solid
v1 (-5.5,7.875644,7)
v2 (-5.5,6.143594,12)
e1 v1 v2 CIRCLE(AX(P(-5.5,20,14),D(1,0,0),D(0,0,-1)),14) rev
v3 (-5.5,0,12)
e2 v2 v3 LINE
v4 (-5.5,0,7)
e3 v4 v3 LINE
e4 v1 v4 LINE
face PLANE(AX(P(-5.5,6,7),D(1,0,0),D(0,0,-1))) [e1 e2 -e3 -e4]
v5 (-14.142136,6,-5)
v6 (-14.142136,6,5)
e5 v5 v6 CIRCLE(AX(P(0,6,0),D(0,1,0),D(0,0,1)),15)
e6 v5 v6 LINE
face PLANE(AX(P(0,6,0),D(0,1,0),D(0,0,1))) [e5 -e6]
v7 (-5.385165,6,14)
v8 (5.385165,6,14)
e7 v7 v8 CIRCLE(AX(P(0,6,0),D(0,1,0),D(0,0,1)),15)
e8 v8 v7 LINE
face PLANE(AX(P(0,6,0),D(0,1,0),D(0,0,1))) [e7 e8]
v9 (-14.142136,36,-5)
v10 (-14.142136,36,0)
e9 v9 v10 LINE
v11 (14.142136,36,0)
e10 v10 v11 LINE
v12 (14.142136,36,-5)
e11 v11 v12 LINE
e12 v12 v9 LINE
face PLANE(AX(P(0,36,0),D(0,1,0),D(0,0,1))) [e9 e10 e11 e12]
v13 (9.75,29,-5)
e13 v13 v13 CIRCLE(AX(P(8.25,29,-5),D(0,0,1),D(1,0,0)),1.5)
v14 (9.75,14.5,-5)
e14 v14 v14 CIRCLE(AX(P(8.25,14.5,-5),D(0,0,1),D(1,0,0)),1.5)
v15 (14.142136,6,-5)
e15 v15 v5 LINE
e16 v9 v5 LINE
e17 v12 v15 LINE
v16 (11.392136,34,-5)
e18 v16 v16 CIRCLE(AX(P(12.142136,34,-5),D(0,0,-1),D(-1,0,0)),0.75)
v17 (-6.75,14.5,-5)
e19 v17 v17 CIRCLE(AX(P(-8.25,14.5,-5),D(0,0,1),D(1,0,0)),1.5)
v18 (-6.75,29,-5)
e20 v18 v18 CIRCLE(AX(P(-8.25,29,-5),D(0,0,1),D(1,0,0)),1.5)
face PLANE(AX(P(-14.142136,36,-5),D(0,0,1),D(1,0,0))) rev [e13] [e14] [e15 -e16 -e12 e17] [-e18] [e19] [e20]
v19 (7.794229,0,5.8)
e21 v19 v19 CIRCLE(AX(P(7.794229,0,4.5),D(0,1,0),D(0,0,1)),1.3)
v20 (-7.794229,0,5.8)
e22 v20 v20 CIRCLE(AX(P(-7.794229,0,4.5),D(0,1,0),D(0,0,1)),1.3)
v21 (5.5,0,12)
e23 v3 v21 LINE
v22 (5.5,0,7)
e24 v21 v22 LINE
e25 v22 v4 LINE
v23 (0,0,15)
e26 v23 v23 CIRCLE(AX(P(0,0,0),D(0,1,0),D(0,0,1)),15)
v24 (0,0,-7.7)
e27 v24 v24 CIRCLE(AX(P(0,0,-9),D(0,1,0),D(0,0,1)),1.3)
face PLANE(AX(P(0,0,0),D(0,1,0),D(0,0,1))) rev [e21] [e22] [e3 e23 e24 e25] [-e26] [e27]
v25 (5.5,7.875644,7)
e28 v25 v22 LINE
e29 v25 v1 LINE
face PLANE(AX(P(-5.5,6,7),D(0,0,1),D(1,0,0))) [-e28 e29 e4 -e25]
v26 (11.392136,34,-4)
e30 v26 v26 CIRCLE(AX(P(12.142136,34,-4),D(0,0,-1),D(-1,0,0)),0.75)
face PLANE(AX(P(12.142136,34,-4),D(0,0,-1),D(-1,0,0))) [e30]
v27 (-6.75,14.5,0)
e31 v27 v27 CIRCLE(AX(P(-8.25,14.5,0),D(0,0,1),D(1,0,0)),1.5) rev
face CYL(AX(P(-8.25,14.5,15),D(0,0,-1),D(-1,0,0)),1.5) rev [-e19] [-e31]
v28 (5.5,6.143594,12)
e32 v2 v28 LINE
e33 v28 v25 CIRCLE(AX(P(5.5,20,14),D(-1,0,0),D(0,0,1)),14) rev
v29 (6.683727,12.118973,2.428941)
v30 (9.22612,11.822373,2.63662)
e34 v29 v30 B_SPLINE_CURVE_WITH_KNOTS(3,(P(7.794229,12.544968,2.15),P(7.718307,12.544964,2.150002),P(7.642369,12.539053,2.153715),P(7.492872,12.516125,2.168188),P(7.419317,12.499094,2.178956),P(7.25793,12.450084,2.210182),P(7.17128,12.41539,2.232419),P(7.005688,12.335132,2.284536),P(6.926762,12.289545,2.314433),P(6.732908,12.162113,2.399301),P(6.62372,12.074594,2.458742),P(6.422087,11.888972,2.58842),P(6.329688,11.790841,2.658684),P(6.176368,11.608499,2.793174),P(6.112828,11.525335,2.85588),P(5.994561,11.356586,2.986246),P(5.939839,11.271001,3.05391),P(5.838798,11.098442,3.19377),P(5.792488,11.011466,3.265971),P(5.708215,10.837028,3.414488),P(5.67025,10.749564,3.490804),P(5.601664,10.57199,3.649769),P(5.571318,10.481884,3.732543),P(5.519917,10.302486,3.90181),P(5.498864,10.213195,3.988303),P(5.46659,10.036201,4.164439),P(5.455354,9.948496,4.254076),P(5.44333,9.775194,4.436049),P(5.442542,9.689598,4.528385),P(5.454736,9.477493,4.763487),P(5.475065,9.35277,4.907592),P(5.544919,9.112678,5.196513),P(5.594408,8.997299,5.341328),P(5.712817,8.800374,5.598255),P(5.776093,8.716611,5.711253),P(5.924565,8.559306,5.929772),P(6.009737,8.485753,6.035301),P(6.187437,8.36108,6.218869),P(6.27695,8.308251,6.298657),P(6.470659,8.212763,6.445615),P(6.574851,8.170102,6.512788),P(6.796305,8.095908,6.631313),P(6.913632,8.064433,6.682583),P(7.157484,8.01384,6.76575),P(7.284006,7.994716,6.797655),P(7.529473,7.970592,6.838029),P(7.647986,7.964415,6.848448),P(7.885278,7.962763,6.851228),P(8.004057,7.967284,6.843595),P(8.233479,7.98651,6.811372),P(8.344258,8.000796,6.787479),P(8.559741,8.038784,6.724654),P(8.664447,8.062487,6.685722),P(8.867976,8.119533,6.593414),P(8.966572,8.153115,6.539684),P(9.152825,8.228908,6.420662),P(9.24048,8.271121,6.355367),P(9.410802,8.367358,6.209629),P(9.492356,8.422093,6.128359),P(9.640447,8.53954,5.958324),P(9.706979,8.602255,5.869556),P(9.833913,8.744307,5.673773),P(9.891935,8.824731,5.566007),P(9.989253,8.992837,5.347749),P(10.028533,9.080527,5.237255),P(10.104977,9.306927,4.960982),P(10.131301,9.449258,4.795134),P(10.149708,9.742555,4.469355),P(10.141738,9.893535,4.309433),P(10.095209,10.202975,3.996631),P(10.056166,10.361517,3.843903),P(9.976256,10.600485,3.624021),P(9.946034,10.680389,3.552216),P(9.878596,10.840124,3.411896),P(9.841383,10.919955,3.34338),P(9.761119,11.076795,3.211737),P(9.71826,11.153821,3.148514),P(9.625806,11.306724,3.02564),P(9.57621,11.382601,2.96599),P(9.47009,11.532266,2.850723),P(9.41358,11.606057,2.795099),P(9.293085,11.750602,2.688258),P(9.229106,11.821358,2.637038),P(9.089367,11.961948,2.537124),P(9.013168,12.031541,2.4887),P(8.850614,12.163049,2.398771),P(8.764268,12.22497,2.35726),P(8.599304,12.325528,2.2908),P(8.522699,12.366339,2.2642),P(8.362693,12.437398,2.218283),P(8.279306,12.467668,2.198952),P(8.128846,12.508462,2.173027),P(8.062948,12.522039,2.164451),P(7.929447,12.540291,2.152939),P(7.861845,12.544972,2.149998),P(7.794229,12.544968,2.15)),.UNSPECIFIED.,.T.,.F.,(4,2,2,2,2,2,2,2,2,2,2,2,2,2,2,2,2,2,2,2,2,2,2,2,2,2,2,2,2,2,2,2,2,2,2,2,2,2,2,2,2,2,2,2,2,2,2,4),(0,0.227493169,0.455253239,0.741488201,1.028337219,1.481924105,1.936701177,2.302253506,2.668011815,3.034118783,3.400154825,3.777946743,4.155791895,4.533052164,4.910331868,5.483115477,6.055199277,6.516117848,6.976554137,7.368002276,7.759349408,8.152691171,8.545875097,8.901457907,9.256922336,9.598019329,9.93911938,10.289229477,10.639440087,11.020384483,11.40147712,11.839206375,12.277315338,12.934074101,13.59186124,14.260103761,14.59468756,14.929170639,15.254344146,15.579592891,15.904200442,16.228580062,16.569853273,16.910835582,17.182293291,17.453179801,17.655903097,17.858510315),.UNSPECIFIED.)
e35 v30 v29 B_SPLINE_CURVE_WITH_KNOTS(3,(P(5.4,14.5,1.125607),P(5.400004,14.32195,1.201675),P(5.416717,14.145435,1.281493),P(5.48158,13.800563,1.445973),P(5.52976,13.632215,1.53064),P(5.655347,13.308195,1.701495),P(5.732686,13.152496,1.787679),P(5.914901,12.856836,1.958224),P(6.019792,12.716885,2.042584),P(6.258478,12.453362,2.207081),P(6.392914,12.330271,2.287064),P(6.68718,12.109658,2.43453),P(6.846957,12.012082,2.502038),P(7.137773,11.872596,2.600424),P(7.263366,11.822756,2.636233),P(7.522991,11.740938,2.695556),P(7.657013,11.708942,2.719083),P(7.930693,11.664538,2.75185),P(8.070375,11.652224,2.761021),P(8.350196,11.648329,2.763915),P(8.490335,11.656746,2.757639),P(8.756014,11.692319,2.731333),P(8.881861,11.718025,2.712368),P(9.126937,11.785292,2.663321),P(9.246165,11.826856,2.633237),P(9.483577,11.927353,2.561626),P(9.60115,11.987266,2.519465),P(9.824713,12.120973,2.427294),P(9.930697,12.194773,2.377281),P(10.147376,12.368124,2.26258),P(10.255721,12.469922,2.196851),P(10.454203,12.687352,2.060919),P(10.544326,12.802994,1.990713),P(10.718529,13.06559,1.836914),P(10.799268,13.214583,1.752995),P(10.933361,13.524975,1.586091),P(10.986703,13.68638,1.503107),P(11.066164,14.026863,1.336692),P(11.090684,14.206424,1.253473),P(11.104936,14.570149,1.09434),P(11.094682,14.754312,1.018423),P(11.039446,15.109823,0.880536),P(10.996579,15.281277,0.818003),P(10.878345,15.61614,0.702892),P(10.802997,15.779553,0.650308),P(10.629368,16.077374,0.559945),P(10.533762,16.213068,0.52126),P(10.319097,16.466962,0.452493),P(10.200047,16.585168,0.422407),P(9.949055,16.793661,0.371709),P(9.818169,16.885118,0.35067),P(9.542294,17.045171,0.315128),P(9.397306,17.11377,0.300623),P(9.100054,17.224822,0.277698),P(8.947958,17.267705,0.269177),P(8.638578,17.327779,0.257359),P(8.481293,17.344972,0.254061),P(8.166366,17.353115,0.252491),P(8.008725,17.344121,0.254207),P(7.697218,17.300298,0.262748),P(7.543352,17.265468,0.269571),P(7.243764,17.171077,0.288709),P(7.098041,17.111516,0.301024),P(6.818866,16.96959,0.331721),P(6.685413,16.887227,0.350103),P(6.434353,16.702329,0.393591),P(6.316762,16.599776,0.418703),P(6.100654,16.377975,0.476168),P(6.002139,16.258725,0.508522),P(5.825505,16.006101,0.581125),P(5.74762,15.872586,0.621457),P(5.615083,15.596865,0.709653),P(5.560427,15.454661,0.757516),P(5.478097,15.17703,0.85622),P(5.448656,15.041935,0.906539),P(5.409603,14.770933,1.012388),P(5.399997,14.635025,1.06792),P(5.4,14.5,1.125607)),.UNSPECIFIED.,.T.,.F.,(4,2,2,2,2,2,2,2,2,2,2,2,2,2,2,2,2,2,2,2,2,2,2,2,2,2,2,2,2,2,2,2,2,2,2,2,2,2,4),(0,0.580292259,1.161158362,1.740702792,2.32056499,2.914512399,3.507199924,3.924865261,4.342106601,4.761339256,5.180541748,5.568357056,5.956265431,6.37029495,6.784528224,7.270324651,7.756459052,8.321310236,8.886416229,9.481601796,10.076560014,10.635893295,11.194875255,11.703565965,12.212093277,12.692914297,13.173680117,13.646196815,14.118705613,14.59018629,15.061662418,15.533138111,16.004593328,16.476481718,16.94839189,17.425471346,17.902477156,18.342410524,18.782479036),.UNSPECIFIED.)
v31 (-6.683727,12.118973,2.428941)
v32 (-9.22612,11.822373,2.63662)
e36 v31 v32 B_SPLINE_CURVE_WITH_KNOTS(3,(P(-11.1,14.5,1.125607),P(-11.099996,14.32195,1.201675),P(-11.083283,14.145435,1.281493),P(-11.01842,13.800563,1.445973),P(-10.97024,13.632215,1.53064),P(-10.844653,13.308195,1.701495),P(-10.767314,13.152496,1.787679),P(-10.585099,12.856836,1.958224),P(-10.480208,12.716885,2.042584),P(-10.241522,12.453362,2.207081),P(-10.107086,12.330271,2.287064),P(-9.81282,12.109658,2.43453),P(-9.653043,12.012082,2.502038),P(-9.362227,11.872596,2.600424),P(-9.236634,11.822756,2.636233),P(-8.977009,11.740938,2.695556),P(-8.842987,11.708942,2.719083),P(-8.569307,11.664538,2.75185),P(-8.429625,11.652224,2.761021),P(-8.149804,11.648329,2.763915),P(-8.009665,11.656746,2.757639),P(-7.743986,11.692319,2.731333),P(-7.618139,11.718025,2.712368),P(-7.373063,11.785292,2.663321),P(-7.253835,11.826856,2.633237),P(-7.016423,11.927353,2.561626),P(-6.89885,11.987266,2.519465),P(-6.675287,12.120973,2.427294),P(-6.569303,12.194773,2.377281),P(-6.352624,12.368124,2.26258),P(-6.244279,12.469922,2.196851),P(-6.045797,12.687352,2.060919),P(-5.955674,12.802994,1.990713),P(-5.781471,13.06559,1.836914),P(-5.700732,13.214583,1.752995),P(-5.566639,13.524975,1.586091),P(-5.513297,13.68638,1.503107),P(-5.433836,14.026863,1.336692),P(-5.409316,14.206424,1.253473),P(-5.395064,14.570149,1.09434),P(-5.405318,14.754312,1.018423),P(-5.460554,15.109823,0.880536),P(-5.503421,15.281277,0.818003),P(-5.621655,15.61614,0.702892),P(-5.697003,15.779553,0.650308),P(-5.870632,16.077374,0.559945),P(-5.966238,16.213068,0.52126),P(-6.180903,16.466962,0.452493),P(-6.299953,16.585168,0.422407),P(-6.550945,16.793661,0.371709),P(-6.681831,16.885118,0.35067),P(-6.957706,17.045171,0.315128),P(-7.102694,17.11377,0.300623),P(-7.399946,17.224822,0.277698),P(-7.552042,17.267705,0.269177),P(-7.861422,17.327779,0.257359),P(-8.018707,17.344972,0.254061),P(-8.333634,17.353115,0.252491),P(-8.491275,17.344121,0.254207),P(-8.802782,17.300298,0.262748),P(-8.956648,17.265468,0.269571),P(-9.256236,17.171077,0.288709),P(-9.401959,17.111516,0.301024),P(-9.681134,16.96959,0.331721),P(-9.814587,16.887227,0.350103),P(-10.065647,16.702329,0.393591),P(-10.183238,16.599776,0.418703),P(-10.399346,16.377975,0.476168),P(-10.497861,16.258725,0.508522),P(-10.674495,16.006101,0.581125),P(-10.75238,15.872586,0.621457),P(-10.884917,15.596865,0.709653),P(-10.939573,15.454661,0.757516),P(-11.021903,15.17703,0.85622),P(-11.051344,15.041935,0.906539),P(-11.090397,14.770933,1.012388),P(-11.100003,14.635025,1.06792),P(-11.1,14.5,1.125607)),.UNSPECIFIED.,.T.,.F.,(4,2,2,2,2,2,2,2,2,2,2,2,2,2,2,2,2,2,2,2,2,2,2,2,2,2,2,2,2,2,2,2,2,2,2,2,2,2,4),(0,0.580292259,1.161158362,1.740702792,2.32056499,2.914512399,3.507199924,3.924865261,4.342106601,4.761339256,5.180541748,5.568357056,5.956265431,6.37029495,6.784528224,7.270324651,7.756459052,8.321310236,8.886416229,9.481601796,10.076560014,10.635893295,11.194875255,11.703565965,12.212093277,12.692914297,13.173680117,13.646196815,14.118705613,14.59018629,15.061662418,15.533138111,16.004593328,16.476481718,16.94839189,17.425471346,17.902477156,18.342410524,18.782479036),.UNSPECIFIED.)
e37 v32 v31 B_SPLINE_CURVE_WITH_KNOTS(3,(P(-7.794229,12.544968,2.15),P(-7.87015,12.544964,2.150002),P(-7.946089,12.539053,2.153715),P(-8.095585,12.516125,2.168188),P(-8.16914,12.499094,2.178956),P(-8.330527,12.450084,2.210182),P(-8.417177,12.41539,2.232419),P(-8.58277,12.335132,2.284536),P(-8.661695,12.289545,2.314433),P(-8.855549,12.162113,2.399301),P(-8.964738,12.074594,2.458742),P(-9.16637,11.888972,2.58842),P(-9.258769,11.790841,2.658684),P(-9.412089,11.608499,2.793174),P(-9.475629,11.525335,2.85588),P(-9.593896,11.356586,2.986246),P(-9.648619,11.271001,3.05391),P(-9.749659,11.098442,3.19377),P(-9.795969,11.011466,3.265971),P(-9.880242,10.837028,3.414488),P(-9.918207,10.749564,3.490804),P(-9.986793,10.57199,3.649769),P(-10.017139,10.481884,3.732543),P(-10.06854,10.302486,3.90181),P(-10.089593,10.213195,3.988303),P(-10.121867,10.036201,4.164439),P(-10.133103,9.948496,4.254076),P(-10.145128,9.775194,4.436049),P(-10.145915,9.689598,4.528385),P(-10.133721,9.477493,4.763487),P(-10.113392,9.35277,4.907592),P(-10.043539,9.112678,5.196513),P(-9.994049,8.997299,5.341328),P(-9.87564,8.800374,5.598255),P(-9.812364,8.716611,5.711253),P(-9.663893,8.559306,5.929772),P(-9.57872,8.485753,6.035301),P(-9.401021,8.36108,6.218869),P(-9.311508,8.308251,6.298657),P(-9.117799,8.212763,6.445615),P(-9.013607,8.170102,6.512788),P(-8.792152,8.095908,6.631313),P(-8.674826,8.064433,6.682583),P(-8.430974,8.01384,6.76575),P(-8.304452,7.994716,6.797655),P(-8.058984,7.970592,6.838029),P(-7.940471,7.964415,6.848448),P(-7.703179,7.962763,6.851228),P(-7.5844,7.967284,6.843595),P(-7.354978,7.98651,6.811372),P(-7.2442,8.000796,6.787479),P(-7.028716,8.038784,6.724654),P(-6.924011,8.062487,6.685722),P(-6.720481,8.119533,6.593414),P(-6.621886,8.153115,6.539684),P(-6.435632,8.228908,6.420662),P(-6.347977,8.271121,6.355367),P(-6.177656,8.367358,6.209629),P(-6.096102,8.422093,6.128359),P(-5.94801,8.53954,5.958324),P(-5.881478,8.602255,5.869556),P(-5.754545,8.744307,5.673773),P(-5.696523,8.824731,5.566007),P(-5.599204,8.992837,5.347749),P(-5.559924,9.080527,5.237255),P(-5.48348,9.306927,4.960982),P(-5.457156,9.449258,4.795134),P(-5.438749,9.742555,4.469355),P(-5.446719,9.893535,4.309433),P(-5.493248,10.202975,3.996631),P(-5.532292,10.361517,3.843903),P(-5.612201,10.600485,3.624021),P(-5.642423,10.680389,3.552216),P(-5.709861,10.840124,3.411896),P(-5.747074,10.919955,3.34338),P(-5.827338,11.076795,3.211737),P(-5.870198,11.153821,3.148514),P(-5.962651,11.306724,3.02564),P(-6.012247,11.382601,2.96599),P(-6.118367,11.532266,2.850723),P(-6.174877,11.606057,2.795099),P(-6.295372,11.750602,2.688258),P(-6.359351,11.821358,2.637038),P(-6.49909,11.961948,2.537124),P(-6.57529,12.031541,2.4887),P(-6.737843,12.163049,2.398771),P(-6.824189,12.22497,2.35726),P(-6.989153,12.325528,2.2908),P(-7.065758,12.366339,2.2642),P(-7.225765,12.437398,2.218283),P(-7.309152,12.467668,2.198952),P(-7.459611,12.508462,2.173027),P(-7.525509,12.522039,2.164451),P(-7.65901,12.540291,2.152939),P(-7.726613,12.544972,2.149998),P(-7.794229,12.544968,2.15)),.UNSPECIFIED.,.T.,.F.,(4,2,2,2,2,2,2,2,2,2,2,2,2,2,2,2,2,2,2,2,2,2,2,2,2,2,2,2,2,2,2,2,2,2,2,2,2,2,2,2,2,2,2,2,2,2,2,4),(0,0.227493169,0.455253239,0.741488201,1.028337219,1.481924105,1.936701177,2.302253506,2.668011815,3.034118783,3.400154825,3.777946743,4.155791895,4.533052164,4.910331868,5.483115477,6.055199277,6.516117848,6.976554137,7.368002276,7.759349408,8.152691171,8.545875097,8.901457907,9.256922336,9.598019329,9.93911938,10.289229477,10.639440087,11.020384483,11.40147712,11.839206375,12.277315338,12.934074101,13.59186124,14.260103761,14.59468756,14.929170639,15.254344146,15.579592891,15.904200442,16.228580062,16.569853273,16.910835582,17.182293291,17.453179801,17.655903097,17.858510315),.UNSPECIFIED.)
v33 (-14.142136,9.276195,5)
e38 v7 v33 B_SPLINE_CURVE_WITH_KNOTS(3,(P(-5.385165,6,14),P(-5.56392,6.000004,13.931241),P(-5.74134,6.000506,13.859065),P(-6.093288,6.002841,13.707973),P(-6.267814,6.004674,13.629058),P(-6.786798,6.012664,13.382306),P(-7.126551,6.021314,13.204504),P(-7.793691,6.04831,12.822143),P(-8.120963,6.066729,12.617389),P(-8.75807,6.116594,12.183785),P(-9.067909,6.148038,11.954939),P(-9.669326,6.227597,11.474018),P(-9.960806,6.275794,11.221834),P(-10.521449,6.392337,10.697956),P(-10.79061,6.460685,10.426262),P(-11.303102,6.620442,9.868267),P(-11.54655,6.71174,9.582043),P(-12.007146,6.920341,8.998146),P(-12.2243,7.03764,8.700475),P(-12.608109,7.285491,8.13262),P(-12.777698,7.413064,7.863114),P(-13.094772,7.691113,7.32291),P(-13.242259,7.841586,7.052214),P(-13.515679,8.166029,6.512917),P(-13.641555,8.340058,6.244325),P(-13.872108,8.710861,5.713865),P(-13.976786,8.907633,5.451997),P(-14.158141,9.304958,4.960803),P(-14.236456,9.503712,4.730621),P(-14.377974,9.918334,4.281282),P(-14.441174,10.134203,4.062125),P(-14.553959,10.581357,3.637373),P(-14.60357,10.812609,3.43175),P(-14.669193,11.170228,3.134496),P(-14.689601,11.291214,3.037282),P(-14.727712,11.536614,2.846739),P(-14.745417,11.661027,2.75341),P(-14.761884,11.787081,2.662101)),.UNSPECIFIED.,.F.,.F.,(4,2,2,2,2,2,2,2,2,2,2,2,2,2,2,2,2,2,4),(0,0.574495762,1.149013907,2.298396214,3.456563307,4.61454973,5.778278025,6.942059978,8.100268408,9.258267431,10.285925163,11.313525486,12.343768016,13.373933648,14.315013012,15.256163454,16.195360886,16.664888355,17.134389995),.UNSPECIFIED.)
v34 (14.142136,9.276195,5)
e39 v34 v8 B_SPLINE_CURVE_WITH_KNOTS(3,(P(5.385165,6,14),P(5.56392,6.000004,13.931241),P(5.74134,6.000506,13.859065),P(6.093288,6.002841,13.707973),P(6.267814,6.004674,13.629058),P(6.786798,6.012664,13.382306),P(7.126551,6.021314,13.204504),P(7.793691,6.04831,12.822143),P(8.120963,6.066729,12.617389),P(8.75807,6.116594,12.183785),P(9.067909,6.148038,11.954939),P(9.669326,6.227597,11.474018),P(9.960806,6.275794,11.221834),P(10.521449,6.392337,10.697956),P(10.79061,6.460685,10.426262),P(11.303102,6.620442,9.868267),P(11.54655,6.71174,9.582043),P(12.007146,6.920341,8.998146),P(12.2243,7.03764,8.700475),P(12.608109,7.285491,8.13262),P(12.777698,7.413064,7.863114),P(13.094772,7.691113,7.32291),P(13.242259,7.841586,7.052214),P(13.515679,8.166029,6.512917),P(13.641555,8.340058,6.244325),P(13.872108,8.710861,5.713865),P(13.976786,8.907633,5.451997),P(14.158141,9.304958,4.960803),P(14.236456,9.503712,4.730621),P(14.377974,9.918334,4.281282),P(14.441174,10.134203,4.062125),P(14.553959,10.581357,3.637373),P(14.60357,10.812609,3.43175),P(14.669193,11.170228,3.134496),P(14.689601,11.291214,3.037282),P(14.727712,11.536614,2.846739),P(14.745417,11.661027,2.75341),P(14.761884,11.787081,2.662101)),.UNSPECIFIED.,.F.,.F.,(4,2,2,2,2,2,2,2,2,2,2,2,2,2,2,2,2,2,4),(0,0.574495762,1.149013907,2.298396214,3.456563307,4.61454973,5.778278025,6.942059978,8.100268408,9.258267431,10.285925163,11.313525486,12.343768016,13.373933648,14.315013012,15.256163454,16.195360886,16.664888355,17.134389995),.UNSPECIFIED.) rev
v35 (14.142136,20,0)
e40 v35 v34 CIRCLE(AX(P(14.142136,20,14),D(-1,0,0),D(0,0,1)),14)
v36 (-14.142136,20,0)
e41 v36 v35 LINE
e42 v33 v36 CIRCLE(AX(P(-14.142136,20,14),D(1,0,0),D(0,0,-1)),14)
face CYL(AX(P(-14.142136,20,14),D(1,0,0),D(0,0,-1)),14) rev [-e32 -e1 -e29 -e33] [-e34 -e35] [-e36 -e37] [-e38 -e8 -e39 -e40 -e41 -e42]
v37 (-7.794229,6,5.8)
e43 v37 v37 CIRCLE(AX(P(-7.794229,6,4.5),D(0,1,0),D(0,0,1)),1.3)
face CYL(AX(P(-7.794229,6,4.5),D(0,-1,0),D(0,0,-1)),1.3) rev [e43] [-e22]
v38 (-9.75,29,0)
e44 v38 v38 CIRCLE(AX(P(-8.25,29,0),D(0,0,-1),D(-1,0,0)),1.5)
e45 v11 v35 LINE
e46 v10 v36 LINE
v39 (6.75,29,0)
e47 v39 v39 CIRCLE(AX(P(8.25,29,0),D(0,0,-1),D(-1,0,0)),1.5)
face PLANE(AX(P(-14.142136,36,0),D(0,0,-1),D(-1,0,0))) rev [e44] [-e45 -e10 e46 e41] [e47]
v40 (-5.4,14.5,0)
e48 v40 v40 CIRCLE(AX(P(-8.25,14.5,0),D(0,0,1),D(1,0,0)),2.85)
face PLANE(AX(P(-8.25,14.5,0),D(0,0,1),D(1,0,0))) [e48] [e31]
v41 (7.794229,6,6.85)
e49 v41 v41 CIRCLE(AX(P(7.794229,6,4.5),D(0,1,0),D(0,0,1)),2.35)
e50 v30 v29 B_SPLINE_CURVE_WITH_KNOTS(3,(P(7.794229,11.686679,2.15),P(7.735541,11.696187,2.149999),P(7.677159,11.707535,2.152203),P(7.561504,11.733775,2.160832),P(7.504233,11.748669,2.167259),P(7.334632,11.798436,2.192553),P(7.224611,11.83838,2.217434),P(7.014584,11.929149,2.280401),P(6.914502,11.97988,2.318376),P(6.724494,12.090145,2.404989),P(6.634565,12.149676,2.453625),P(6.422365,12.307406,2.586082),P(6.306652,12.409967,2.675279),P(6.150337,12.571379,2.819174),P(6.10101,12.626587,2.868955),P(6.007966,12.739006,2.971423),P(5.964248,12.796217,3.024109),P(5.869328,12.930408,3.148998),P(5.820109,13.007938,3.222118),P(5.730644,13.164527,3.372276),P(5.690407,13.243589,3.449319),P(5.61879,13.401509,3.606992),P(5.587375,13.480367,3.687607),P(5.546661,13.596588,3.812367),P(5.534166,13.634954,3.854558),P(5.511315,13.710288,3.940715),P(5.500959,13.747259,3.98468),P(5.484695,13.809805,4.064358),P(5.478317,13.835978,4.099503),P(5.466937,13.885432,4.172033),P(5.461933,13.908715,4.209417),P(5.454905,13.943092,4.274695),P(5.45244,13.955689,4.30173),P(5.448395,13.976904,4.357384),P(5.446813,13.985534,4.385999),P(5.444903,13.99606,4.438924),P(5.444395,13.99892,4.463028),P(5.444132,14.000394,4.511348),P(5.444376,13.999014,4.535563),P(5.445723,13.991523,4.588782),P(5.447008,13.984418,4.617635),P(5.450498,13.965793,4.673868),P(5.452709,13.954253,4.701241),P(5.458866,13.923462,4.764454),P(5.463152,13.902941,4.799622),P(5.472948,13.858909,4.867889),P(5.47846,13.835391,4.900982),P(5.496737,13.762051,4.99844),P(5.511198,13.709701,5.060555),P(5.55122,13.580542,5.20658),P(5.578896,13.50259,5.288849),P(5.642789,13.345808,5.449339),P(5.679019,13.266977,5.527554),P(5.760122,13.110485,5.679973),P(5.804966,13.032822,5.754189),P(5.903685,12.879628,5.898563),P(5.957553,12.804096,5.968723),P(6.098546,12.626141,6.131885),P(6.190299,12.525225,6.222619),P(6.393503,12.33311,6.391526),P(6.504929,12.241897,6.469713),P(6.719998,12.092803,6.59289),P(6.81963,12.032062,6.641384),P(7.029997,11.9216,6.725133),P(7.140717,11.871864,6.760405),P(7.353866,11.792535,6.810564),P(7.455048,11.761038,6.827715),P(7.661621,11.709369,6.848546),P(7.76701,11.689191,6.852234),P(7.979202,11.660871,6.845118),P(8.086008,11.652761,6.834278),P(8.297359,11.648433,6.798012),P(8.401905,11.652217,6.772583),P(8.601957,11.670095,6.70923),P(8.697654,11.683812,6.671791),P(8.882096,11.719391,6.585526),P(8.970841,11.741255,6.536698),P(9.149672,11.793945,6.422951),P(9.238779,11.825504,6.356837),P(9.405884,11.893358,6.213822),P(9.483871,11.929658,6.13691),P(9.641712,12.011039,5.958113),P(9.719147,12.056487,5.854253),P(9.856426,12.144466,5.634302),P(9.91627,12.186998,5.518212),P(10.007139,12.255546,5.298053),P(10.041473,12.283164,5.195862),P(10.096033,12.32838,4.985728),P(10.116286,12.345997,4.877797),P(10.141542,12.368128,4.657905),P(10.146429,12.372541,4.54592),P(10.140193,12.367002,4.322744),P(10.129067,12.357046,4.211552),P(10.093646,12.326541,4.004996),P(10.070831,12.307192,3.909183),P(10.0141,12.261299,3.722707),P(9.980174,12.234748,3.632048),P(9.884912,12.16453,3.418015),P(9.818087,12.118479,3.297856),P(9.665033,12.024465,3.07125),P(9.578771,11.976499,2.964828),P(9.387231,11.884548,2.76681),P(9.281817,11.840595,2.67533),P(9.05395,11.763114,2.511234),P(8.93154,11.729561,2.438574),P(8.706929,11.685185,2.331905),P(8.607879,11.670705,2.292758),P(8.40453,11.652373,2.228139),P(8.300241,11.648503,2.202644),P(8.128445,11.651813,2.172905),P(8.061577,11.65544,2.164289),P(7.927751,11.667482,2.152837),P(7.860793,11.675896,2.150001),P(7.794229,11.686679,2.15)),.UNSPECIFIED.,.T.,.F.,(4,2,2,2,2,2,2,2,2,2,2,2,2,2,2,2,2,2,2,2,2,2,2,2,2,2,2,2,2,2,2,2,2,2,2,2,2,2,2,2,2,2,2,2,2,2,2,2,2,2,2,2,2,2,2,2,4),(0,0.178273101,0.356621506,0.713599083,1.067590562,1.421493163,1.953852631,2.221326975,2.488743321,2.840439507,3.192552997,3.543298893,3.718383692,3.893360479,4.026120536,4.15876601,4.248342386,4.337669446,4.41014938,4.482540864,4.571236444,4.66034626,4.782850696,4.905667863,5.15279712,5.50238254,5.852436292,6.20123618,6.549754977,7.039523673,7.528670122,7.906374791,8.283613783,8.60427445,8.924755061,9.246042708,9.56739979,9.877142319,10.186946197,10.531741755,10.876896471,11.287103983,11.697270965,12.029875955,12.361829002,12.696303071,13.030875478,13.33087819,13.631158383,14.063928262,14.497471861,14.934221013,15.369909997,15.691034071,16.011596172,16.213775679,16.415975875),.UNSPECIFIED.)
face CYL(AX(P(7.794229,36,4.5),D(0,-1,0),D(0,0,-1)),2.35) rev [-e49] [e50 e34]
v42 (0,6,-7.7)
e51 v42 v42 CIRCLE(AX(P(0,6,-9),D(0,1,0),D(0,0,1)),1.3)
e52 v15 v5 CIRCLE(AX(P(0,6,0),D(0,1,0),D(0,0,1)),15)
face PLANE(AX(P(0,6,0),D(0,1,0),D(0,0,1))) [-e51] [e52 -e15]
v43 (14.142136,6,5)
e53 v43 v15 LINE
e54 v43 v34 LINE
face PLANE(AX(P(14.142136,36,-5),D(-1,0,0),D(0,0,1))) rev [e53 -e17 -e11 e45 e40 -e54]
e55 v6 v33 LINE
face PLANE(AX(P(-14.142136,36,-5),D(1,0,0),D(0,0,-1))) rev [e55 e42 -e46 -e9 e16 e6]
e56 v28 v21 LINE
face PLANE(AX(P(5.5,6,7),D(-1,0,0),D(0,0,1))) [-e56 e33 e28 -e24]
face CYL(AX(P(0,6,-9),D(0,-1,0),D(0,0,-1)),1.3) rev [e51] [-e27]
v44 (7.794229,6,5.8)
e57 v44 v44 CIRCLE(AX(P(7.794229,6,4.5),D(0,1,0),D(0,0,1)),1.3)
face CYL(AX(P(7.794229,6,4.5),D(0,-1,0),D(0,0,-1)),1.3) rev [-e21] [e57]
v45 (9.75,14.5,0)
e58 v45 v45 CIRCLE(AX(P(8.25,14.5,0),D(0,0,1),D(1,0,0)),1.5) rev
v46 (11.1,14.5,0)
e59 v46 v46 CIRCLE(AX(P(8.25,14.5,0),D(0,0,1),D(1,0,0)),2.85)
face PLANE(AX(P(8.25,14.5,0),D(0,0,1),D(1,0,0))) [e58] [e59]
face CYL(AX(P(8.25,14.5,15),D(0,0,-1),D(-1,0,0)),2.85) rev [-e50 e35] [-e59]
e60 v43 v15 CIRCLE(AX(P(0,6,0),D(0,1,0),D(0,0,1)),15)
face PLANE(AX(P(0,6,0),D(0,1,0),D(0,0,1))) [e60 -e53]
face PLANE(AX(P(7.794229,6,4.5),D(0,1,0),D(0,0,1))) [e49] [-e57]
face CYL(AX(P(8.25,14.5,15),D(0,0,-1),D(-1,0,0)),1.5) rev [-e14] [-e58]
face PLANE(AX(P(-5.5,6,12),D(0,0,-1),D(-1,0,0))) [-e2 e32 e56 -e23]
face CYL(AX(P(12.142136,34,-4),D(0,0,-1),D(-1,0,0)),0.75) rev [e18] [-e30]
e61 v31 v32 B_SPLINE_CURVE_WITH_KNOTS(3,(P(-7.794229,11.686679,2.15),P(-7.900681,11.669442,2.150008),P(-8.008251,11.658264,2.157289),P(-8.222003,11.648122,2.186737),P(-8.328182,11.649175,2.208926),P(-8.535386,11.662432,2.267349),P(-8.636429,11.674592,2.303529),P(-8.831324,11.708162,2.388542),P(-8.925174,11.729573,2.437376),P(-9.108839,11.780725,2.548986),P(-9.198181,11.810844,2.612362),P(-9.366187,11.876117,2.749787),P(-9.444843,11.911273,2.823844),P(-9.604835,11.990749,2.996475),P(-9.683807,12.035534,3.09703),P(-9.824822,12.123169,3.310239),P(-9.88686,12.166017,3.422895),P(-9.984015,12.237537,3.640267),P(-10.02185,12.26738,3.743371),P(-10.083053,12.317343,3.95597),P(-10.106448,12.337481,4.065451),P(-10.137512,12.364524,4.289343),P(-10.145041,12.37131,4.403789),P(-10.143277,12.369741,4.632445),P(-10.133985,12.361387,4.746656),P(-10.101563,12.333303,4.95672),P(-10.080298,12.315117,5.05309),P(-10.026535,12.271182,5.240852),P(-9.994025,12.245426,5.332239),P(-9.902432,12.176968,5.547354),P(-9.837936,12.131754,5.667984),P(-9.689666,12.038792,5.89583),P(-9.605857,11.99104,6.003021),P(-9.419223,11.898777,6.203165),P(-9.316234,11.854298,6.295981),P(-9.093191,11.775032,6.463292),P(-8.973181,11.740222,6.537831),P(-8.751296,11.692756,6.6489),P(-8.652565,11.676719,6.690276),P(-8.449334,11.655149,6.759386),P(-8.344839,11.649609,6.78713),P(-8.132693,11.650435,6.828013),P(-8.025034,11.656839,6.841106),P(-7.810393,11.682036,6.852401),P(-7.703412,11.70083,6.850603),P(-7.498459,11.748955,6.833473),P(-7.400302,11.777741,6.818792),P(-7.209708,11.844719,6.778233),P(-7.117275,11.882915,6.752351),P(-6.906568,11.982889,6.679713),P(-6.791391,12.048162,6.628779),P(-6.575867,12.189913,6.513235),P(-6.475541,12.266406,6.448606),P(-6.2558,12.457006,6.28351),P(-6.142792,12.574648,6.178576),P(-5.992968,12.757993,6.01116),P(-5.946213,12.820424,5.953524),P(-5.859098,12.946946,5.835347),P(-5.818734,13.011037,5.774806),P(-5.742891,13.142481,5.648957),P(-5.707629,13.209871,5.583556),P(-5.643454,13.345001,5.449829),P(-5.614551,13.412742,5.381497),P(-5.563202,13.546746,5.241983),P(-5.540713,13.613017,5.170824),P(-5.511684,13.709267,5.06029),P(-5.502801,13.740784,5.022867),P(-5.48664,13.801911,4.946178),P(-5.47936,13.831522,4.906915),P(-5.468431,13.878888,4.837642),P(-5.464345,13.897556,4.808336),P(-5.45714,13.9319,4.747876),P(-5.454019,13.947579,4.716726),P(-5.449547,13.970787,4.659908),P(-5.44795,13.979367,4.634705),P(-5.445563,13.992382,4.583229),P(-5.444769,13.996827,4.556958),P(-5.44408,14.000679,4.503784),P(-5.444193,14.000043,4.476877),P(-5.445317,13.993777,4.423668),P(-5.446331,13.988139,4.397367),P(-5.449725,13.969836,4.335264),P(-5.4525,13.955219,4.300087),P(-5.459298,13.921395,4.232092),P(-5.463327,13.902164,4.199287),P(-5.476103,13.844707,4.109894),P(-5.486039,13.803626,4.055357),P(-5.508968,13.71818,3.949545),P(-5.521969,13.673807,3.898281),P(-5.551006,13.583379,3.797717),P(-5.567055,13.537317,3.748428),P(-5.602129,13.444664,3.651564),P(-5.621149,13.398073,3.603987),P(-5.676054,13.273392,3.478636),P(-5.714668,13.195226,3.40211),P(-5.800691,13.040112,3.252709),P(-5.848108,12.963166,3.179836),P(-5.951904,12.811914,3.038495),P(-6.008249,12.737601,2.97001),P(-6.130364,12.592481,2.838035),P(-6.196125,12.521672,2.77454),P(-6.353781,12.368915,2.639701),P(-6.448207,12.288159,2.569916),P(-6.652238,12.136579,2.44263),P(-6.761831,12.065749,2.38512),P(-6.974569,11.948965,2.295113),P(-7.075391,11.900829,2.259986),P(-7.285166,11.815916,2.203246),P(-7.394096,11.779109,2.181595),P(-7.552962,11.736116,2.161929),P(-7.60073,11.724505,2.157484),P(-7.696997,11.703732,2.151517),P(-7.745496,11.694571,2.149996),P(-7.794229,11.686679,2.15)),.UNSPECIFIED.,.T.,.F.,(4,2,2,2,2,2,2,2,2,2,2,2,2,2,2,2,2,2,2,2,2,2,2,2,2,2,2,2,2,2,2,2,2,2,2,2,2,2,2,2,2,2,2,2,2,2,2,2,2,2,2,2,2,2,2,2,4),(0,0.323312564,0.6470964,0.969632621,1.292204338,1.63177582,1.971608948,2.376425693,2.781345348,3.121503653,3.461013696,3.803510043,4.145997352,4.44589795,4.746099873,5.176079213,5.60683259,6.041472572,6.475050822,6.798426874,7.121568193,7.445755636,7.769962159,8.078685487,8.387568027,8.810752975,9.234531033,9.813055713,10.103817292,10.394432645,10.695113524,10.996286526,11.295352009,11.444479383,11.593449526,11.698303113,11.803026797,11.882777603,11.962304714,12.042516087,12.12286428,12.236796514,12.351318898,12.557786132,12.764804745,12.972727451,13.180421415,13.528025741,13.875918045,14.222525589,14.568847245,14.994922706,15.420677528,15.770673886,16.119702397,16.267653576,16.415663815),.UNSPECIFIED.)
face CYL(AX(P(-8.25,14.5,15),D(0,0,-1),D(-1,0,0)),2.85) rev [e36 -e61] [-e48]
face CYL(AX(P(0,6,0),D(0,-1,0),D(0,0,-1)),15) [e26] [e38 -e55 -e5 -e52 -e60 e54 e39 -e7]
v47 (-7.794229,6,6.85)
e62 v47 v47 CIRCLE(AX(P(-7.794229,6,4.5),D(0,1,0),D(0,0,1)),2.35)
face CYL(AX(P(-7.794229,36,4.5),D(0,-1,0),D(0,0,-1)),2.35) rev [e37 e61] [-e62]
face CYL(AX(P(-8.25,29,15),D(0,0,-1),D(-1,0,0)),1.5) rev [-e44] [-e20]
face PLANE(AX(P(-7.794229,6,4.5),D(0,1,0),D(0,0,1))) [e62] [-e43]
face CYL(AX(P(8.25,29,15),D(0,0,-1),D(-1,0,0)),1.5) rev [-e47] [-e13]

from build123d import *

# Parameters (mm, degrees)
SKETCH_1_R               = 15
SKETCH_1_R_2             = 1.3
SKETCH_1_W               = 11
SKETCH_1_H               = 5
EXTRUDE_1_DEPTH          = 6
SKETCH_2_W               = 28.284271248
SKETCH_2_H               = 5
EXTRUDE_2_DEPTH          = 30
CUT_EXTRUDE_1_DEPTH      = 44.829214002
CUT_EXTRUDE_1_DEPTH_BACK = 44.829214002
SKETCH_3_R               = 1.5
FILLET_2_R               = 14
SKETCH_4_R               = 2.35
CUT_EXTRUDE_2_DEPTH      = 37.742346223
SKETCH_5_R               = 2.85
CUT_EXTRUDE_3_DEPTH      = 42.785164903
SKETCH_6_R               = 0.75
CUT_EXTRUDE_4_DEPTH      = 1


with BuildPart() as part:
    # 草图1 → 凸台-拉伸1 (new body)
    with BuildSketch(Plane(origin=(0, 0, 0), x_dir=(1, 0, 0), z_dir=(0, 1, 0))):
        with Locations(Location((0, 0, 0), (0, 0, 270))):
            Circle(SKETCH_1_R)
        with Locations(Location((0, 9, 0), (0, 0, 270))):
            Circle(SKETCH_1_R_2, mode=Mode.SUBTRACT)
        with Locations(Location((7.794228634, -4.5, 0), (0, 0, 270))):
            Circle(SKETCH_1_R_2, mode=Mode.SUBTRACT)
        with Locations(Location((-7.794228634, -4.5, 0), (0, 0, 270))):
            Circle(SKETCH_1_R_2, mode=Mode.SUBTRACT)
        with Locations((0, -9.5)):
            Rectangle(SKETCH_1_W, SKETCH_1_H, mode=Mode.SUBTRACT)
    extrude(amount=EXTRUDE_1_DEPTH)

    # 草图2 → 凸台-拉伸2 (add)
    with BuildSketch(Plane(origin=(0, 6, 0), x_dir=(1, 0, 0), z_dir=(0, 1, 0))):
        with Locations((0, 2.5)):
            Rectangle(SKETCH_2_W, SKETCH_2_H)
    extrude(amount=EXTRUDE_2_DEPTH)

    # 草图3 → 切除-拉伸1 (cut, two sides: drawn at the far end of the back side and taken through both)
    with BuildSketch(Plane(origin=(0, 0, -5), x_dir=(-1, 0, 0), z_dir=(0, 0, -1)).offset(-CUT_EXTRUDE_1_DEPTH_BACK)):
        with Locations((-8.25, 14.5)):
            Circle(SKETCH_3_R)
        with Locations((8.25, 14.5)):
            Circle(SKETCH_3_R)
        with Locations((8.25, 29)):
            Circle(SKETCH_3_R)
        with Locations((-8.25, 29)):
            Circle(SKETCH_3_R)
    extrude(amount=CUT_EXTRUDE_1_DEPTH + CUT_EXTRUDE_1_DEPTH_BACK, mode=Mode.SUBTRACT)

    # 圆角2
    # the kernel refuses this fillet: 14 mm, written as the material it adds along each edge
    with BuildSketch(Plane(origin=(49.142135624, 6, 0), x_dir=(0, 0, 1), z_dir=(-1, 0, 0))) as fillet_2_piece_1_section:
        with BuildLine():
            CenterArc((FILLET_2_R, FILLET_2_R), FILLET_2_R, 180, 90)
            Line((0, FILLET_2_R), (0, 0))
            Line((0, 0), (FILLET_2_R, 0))
        make_face()
    fillet_2_piece_1 = extrude(amount=98.284271247, mode=Mode.PRIVATE)
    fillet_2_piece_1 = fillet_2_piece_1 & Plane(origin=(0, 6.047138864, 0), x_dir=(0, 0, 1), z_dir=(0, -1, 0)) * Cylinder(15, 253, mode=Mode.PRIVATE)
    fillet_2_piece_1 = split(fillet_2_piece_1, bisect_by=Plane(origin=(6.949412774, 6.047138864, 12), z_dir=(0, 0, 1)), keep=Keep.TOP, mode=Mode.PRIVATE)
    add(fillet_2_piece_1)
    with BuildSketch(Plane(origin=(14.142135624, 6, 0), x_dir=(0, 0, 1), z_dir=(-1, 0, 0))) as fillet_2_piece_2_section:
        with BuildLine():
            CenterArc((FILLET_2_R, FILLET_2_R), FILLET_2_R, 180, 90)
            Line((0, FILLET_2_R), (0, 0))
            Line((0, 0), (FILLET_2_R, 0))
        make_face()
    fillet_2_piece_2 = extrude(amount=63.284271247, mode=Mode.PRIVATE)
    fillet_2_piece_2 = fillet_2_piece_2 & Plane(origin=(0, 6.60039406, 0), x_dir=(0, 0, 1), z_dir=(0, -1, 0)) * Cylinder(15, 183, mode=Mode.PRIVATE)
    fillet_2_piece_2 = fillet_2_piece_2 - Plane(origin=(7.794228634, 6.60039406, 4.5), x_dir=(0, 0, 1), z_dir=(0, -1, 0)) * Cylinder(1.3, 183, mode=Mode.PRIVATE)
    fillet_2_piece_2 = split(fillet_2_piece_2, bisect_by=Plane(origin=(5.5, 6.60039406, 8.461968408), z_dir=(1, 0, 0)), keep=Keep.TOP, mode=Mode.PRIVATE)
    fillet_2_piece_2 = fillet_2_piece_2 - Plane(origin=(8.25, 14.5, 8.461968408), x_dir=(-1, 0, 0), z_dir=(0, 0, -1)) * Cylinder(1.5, 183, mode=Mode.PRIVATE)
    add(fillet_2_piece_2)
    with BuildSketch(Plane(origin=(49.142135624, 6, 0), x_dir=(0, 0, 1), z_dir=(-1, 0, 0))) as fillet_2_piece_3_section:
        with BuildLine():
            CenterArc((FILLET_2_R, FILLET_2_R), FILLET_2_R, 180, 90)
            Line((0, FILLET_2_R), (0, 0))
            Line((0, 0), (FILLET_2_R, 0))
        make_face()
    fillet_2_piece_3 = extrude(amount=63.284271247, mode=Mode.PRIVATE)
    fillet_2_piece_3 = fillet_2_piece_3 & Plane(origin=(0, 9.416347891, 0), x_dir=(0, 0, 1), z_dir=(0, -1, 0)) * Cylinder(15, 183, mode=Mode.PRIVATE)
    fillet_2_piece_3 = fillet_2_piece_3 - Plane(origin=(-7.794228634, 9.416347891, 4.5), x_dir=(0, 0, 1), z_dir=(0, -1, 0)) * Cylinder(1.3, 183, mode=Mode.PRIVATE)
    fillet_2_piece_3 = split(fillet_2_piece_3, bisect_by=Plane(origin=(0, 9.416347891, 7), z_dir=(0, 0, -1)), keep=Keep.TOP, mode=Mode.PRIVATE)
    fillet_2_piece_3 = split(fillet_2_piece_3, bisect_by=Plane(origin=(5.5, 9.416347891, 2.497543019), z_dir=(-1, 0, 0)), keep=Keep.TOP, mode=Mode.PRIVATE)
    fillet_2_piece_3 = fillet_2_piece_3 - Plane(origin=(-8.25, 14.5, 2.497543019), x_dir=(-1, 0, 0), z_dir=(0, 0, -1)) * Cylinder(1.5, 183, mode=Mode.PRIVATE)
    add(fillet_2_piece_3)
    with BuildSketch(Plane(origin=(49.142135624, 6, 0), x_dir=(0, 0, 1), z_dir=(-1, 0, 0))) as fillet_2_piece_4_section:
        with BuildLine():
            CenterArc((FILLET_2_R, FILLET_2_R), FILLET_2_R, 180, 90)
            Line((0, FILLET_2_R), (0, 0))
            Line((0, 0), (FILLET_2_R, 0))
        make_face()
    fillet_2_piece_4 = extrude(amount=98.284271247, mode=Mode.PRIVATE)
    fillet_2_piece_4 = fillet_2_piece_4 & Plane(origin=(0, 6.600394024, 0), x_dir=(0, 0, 1), z_dir=(0, -1, 0)) * Cylinder(15, 253, mode=Mode.PRIVATE)
    fillet_2_piece_4 = split(fillet_2_piece_4, bisect_by=Plane(origin=(-8.900767253, 6.600394024, 7), z_dir=(0, 0, 1)), keep=Keep.TOP, mode=Mode.PRIVATE)
    fillet_2_piece_4 = split(fillet_2_piece_4, bisect_by=Plane(origin=(-5.5, 6.600394024, 8.461968263), z_dir=(-1, 0, 0)), keep=Keep.TOP, mode=Mode.PRIVATE)
    add(fillet_2_piece_4)

    # 草图4 → 切除-拉伸2 (cut, through all)
    with BuildSketch(Plane(origin=(0, 6, 0), x_dir=(1, 0, 0), z_dir=(0, 1, 0))):
        with Locations((0, 9)):
            Circle(SKETCH_4_R)
        with Locations(Location((7.794228634, -4.5, 0), (0, 0, 90))):
            Circle(SKETCH_4_R)
        with Locations(Location((-7.794228634, -4.5, 0), (0, 0, 90))):
            Circle(SKETCH_4_R)
    extrude(amount=CUT_EXTRUDE_2_DEPTH, mode=Mode.SUBTRACT)

    # 草图5 → 切除-拉伸3 (cut, through all)
    with BuildSketch(Plane.XY):
        with Locations(Location((8.25, 14.5, 0), (0, 0, 236.662521272))):
            Circle(SKETCH_5_R)
        with Locations(Location((-8.25, 14.5, 0), (0, 0, 249.9708463))):
            Circle(SKETCH_5_R)
    extrude(amount=CUT_EXTRUDE_3_DEPTH, mode=Mode.SUBTRACT)

    # 草图6 → 切除-拉伸4 (cut)
    with BuildSketch(Plane(origin=(0, 0, -5), x_dir=(-1, 0, 0), z_dir=(0, 0, -1))):
        with Locations((-12.142135624, 34)):
            Circle(SKETCH_6_R)
    extrude(amount=-CUT_EXTRUDE_4_DEPTH, mode=Mode.SUBTRACT)


solid = part.part
